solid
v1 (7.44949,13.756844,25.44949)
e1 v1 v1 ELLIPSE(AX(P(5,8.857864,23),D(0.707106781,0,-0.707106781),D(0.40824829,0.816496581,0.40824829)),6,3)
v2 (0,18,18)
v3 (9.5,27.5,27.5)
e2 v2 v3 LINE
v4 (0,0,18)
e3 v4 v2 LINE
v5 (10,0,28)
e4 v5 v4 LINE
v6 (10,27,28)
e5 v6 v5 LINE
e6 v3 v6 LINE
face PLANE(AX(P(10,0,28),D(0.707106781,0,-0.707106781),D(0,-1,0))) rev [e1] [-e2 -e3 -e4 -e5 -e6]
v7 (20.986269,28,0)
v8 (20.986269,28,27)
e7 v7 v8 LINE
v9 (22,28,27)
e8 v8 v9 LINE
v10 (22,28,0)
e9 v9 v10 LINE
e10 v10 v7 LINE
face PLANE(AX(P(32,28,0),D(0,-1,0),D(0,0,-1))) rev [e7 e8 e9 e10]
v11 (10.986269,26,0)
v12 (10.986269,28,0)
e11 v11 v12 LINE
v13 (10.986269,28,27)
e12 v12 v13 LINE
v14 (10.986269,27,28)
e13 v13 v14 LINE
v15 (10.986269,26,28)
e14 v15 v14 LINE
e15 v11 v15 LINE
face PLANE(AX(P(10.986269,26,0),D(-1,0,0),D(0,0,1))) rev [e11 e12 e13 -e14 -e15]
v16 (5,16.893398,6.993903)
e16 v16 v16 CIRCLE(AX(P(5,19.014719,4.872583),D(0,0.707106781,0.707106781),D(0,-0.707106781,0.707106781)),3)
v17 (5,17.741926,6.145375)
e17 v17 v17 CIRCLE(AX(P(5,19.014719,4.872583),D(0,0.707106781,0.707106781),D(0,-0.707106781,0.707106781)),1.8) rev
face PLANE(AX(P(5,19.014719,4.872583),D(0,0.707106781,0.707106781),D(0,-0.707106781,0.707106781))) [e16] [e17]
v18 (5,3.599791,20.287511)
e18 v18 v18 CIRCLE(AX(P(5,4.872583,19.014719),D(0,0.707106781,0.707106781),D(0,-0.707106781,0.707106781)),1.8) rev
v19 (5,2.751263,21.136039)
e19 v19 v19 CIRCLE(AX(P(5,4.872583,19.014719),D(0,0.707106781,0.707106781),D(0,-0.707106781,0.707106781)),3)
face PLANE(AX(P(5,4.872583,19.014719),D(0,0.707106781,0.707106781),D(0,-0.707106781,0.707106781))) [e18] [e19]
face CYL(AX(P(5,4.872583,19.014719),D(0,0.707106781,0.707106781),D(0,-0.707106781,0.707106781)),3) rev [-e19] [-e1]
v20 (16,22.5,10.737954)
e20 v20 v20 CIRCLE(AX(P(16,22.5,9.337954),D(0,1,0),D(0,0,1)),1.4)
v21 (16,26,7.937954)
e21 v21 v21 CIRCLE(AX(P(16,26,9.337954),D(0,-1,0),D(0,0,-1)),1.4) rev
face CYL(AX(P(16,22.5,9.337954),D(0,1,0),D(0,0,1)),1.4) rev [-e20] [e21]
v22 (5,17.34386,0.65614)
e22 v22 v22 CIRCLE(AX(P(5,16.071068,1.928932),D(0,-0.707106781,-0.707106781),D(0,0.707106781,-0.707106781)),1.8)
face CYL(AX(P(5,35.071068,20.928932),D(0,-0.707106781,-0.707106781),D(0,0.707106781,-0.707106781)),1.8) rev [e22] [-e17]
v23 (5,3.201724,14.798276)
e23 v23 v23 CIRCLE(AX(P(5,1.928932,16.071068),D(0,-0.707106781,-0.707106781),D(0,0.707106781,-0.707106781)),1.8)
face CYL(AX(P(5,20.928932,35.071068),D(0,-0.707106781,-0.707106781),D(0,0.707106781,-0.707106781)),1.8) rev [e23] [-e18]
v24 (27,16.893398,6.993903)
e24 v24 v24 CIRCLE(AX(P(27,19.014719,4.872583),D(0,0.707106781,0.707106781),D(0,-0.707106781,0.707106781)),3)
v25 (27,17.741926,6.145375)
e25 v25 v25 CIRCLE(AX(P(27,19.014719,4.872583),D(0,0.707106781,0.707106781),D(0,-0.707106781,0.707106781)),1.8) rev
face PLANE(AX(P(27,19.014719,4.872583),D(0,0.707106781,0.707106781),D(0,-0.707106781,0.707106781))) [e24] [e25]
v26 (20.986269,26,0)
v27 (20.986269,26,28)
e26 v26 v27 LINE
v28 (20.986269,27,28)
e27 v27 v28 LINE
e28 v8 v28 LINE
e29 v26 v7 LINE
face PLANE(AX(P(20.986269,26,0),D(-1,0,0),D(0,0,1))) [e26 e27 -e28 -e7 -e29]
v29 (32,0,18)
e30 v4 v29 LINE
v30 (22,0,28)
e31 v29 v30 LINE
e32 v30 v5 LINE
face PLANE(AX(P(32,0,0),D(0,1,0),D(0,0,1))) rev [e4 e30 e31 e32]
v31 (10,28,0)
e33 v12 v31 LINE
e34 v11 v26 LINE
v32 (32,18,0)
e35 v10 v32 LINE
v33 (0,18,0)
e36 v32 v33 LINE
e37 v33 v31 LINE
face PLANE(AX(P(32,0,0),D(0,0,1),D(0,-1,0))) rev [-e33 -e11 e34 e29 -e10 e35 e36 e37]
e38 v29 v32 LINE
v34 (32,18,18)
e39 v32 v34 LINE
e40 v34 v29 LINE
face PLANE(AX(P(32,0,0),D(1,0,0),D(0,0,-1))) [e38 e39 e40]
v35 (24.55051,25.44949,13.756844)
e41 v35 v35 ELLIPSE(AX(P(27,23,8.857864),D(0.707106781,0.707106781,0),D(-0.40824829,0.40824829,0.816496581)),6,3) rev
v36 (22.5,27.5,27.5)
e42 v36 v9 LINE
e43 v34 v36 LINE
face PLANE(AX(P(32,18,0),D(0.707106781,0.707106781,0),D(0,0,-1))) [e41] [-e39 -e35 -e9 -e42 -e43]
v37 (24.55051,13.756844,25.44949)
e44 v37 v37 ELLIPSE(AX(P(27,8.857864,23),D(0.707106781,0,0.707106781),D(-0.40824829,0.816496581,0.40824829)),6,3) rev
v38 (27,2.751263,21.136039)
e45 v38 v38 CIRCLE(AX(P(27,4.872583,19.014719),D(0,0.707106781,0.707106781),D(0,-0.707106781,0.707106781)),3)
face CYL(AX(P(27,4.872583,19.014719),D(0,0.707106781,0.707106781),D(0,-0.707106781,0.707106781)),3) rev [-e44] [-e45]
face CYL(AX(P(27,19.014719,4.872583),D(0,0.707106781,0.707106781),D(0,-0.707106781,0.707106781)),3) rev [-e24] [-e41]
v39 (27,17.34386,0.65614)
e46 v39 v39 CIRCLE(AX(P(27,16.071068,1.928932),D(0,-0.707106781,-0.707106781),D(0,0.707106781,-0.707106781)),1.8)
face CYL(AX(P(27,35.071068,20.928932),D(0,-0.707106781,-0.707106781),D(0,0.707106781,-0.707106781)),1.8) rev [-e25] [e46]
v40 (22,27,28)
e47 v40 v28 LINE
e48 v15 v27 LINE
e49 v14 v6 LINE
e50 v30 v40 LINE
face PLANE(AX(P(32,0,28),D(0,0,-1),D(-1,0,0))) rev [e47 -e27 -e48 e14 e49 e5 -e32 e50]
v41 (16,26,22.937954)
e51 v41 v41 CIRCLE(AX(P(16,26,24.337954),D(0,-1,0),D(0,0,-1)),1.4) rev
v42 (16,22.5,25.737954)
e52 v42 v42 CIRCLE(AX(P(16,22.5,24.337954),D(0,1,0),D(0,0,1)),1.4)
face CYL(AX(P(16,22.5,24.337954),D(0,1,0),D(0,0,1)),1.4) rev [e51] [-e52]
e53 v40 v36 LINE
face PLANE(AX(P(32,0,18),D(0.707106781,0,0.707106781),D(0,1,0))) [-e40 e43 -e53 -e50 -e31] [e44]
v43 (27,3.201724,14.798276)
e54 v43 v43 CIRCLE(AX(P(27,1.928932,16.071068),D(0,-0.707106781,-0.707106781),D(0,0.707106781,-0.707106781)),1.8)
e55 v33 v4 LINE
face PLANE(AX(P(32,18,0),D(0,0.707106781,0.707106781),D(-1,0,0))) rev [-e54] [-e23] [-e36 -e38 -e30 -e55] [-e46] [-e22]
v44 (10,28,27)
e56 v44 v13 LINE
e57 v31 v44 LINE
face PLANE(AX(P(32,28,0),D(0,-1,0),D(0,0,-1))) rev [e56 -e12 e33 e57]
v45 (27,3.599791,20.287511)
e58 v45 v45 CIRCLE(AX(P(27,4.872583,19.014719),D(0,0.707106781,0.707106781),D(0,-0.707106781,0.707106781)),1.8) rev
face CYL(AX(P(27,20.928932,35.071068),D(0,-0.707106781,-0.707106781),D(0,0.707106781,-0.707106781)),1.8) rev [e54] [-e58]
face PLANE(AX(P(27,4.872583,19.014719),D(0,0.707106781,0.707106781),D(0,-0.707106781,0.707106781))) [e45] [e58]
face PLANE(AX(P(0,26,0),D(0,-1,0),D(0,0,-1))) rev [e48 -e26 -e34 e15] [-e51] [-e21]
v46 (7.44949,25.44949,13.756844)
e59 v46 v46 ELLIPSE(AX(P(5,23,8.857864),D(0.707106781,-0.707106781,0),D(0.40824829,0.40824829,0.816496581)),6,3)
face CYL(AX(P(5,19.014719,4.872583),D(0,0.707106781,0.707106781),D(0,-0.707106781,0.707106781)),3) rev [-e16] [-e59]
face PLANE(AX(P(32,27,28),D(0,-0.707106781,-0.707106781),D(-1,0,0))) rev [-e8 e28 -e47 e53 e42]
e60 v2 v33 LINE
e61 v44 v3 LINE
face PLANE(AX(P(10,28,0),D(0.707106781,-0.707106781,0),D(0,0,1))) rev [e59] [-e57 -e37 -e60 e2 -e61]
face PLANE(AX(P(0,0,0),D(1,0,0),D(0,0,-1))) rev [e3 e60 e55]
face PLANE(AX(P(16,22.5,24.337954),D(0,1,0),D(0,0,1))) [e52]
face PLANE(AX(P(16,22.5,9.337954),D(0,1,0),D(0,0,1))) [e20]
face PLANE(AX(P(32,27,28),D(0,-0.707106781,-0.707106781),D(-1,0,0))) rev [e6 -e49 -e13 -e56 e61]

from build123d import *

# Parameters (mm, degrees)
SKETCH1_W           = 28
SKETCH1_H           = 28
BOSS_EXTRUDE1_DEPTH = 32
CHAMFER1_SIZE       = 18
SKETCH2_R           = 1.4
CUT_EXTRUDE1_DEPTH  = 5.5
CHAMFER2_SIZE       = 1
SKETCH3_R           = 1.8
CUT_EXTRUDE2_DEPTH  = 42.785164832
SKETCH4_R           = 3
CUT_EXTRUDE3_DEPTH  = 22
CHAMFER3_SIZE       = 10
SKETCH5_W           = 10
SKETCH5_H           = 28
CUT_EXTRUDE4_DEPTH  = 2


with BuildPart() as part:
    # Sketch1 → Boss-Extrude1 (new body)
    with BuildSketch(Plane(origin=(0, 0, 0), x_dir=(0, 0, -1), z_dir=(1, 0, 0))):
        with Locations((-14, 14)):
            Rectangle(SKETCH1_W, SKETCH1_H)
    extrude(amount=BOSS_EXTRUDE1_DEPTH)

    # Chamfer1
    chamfer1_edges = [part.edges().sort_by_distance(p)[0] for p in [
        (16, 0, 0),
    ]]
    chamfer(chamfer1_edges, length=CHAMFER1_SIZE)

    # Sketch2 → Cut-Extrude1 (cut)
    with BuildSketch(Plane(origin=(0, 28, 0), x_dir=(1, 0, 0), z_dir=(0, 1, 0))):
        with Locations(Location((16, -9.337953515, 0), (0, 0, 270))):
            Circle(SKETCH2_R)
        with Locations(Location((16, -24.337953515, 0), (0, 0, 270))):
            Circle(SKETCH2_R)
    extrude(amount=-CUT_EXTRUDE1_DEPTH, mode=Mode.SUBTRACT)

    # Chamfer2
    chamfer2_edges = [part.edges().sort_by_distance(p)[0] for p in [
        (16, 28, 28),
    ]]
    chamfer(chamfer2_edges, length=CHAMFER2_SIZE)

    # Sketch3 → Cut-Extrude2 (cut, through all)
    with BuildSketch(Plane(origin=(0, 9, 9), x_dir=(-1, 0, 0), z_dir=(0, -0.7071067811865487, -0.7071067811865465))):
        with Locations(Location((-5, -10, 0), (0, 0, 90))):
            Circle(SKETCH3_R)
        with Locations(Location((-27, -10, 0), (0, 0, 90))):
            Circle(SKETCH3_R)
        with Locations(Location((-27, 10, 0), (0, 0, 90))):
            Circle(SKETCH3_R)
        with Locations(Location((-5, 10, 0), (0, 0, 90))):
            Circle(SKETCH3_R)
    extrude(amount=-CUT_EXTRUDE2_DEPTH, mode=Mode.SUBTRACT)

    # Sketch4 → Cut-Extrude3 (cut)
    with BuildSketch(Plane(origin=(0, 27.5, 27.5), x_dir=(1, 0, 0), z_dir=(0, 0.7071067811865477, 0.7071067811865475))):
        with Locations(Location((5, 10, 0), (0, 0, 270))):
            Circle(SKETCH4_R)
        with Locations(Location((27, 10, 0), (0, 0, 270))):
            Circle(SKETCH4_R)
        with Locations(Location((27, -10, 0), (0, 0, 270))):
            Circle(SKETCH4_R)
        with Locations(Location((5, -10, 0), (0, 0, 270))):
            Circle(SKETCH4_R)
    extrude(amount=-CUT_EXTRUDE3_DEPTH, mode=Mode.SUBTRACT)

    # Chamfer3
    # the kernel refuses this chamfer: 10 mm, written as the material it takes off along each edge
    with BuildSketch(Plane(origin=(0, 28, 52.71682988), x_dir=(-0.027495876610586372, -0.9996219169112968, 0), z_dir=(0, 0, -1)), Plane(origin=(0, -25.71682988, 28), x_dir=(-0.027495876610586372, 0, -0.9996219169112968), z_dir=(0, 1, 0)), Plane(origin=(32, -25.71682988, 28), x_dir=(-0.9996219169112968, 0, 0.027495876610586317), z_dir=(0, 1, 0)), Plane(origin=(32, 28, 52.71682988), x_dir=(-0.9996219169112968, 0.027495876610586317, 0), z_dir=(0, 0, -1))) as chamfer3_piece_1:
        Polygon((CHAMFER3_SIZE * 0.999621916911, -CHAMFER3_SIZE * 0.0274958766106), (-CHAMFER3_SIZE * 0.0274958766106, -CHAMFER3_SIZE * 0.999621916911), (0, 0), align=None)
    extrude(amount=78.433659759, mode=Mode.SUBTRACT)

    # Sketch5 → Cut-Extrude4 (cut)
    with BuildSketch(Plane(origin=(0, 28, 0), x_dir=(1, 0, 0), z_dir=(0, 1, 0))):
        with Locations((15.986268974, -14)):
            Rectangle(SKETCH5_W, SKETCH5_H)
    extrude(amount=-CUT_EXTRUDE4_DEPTH, mode=Mode.SUBTRACT)


solid = part.part
